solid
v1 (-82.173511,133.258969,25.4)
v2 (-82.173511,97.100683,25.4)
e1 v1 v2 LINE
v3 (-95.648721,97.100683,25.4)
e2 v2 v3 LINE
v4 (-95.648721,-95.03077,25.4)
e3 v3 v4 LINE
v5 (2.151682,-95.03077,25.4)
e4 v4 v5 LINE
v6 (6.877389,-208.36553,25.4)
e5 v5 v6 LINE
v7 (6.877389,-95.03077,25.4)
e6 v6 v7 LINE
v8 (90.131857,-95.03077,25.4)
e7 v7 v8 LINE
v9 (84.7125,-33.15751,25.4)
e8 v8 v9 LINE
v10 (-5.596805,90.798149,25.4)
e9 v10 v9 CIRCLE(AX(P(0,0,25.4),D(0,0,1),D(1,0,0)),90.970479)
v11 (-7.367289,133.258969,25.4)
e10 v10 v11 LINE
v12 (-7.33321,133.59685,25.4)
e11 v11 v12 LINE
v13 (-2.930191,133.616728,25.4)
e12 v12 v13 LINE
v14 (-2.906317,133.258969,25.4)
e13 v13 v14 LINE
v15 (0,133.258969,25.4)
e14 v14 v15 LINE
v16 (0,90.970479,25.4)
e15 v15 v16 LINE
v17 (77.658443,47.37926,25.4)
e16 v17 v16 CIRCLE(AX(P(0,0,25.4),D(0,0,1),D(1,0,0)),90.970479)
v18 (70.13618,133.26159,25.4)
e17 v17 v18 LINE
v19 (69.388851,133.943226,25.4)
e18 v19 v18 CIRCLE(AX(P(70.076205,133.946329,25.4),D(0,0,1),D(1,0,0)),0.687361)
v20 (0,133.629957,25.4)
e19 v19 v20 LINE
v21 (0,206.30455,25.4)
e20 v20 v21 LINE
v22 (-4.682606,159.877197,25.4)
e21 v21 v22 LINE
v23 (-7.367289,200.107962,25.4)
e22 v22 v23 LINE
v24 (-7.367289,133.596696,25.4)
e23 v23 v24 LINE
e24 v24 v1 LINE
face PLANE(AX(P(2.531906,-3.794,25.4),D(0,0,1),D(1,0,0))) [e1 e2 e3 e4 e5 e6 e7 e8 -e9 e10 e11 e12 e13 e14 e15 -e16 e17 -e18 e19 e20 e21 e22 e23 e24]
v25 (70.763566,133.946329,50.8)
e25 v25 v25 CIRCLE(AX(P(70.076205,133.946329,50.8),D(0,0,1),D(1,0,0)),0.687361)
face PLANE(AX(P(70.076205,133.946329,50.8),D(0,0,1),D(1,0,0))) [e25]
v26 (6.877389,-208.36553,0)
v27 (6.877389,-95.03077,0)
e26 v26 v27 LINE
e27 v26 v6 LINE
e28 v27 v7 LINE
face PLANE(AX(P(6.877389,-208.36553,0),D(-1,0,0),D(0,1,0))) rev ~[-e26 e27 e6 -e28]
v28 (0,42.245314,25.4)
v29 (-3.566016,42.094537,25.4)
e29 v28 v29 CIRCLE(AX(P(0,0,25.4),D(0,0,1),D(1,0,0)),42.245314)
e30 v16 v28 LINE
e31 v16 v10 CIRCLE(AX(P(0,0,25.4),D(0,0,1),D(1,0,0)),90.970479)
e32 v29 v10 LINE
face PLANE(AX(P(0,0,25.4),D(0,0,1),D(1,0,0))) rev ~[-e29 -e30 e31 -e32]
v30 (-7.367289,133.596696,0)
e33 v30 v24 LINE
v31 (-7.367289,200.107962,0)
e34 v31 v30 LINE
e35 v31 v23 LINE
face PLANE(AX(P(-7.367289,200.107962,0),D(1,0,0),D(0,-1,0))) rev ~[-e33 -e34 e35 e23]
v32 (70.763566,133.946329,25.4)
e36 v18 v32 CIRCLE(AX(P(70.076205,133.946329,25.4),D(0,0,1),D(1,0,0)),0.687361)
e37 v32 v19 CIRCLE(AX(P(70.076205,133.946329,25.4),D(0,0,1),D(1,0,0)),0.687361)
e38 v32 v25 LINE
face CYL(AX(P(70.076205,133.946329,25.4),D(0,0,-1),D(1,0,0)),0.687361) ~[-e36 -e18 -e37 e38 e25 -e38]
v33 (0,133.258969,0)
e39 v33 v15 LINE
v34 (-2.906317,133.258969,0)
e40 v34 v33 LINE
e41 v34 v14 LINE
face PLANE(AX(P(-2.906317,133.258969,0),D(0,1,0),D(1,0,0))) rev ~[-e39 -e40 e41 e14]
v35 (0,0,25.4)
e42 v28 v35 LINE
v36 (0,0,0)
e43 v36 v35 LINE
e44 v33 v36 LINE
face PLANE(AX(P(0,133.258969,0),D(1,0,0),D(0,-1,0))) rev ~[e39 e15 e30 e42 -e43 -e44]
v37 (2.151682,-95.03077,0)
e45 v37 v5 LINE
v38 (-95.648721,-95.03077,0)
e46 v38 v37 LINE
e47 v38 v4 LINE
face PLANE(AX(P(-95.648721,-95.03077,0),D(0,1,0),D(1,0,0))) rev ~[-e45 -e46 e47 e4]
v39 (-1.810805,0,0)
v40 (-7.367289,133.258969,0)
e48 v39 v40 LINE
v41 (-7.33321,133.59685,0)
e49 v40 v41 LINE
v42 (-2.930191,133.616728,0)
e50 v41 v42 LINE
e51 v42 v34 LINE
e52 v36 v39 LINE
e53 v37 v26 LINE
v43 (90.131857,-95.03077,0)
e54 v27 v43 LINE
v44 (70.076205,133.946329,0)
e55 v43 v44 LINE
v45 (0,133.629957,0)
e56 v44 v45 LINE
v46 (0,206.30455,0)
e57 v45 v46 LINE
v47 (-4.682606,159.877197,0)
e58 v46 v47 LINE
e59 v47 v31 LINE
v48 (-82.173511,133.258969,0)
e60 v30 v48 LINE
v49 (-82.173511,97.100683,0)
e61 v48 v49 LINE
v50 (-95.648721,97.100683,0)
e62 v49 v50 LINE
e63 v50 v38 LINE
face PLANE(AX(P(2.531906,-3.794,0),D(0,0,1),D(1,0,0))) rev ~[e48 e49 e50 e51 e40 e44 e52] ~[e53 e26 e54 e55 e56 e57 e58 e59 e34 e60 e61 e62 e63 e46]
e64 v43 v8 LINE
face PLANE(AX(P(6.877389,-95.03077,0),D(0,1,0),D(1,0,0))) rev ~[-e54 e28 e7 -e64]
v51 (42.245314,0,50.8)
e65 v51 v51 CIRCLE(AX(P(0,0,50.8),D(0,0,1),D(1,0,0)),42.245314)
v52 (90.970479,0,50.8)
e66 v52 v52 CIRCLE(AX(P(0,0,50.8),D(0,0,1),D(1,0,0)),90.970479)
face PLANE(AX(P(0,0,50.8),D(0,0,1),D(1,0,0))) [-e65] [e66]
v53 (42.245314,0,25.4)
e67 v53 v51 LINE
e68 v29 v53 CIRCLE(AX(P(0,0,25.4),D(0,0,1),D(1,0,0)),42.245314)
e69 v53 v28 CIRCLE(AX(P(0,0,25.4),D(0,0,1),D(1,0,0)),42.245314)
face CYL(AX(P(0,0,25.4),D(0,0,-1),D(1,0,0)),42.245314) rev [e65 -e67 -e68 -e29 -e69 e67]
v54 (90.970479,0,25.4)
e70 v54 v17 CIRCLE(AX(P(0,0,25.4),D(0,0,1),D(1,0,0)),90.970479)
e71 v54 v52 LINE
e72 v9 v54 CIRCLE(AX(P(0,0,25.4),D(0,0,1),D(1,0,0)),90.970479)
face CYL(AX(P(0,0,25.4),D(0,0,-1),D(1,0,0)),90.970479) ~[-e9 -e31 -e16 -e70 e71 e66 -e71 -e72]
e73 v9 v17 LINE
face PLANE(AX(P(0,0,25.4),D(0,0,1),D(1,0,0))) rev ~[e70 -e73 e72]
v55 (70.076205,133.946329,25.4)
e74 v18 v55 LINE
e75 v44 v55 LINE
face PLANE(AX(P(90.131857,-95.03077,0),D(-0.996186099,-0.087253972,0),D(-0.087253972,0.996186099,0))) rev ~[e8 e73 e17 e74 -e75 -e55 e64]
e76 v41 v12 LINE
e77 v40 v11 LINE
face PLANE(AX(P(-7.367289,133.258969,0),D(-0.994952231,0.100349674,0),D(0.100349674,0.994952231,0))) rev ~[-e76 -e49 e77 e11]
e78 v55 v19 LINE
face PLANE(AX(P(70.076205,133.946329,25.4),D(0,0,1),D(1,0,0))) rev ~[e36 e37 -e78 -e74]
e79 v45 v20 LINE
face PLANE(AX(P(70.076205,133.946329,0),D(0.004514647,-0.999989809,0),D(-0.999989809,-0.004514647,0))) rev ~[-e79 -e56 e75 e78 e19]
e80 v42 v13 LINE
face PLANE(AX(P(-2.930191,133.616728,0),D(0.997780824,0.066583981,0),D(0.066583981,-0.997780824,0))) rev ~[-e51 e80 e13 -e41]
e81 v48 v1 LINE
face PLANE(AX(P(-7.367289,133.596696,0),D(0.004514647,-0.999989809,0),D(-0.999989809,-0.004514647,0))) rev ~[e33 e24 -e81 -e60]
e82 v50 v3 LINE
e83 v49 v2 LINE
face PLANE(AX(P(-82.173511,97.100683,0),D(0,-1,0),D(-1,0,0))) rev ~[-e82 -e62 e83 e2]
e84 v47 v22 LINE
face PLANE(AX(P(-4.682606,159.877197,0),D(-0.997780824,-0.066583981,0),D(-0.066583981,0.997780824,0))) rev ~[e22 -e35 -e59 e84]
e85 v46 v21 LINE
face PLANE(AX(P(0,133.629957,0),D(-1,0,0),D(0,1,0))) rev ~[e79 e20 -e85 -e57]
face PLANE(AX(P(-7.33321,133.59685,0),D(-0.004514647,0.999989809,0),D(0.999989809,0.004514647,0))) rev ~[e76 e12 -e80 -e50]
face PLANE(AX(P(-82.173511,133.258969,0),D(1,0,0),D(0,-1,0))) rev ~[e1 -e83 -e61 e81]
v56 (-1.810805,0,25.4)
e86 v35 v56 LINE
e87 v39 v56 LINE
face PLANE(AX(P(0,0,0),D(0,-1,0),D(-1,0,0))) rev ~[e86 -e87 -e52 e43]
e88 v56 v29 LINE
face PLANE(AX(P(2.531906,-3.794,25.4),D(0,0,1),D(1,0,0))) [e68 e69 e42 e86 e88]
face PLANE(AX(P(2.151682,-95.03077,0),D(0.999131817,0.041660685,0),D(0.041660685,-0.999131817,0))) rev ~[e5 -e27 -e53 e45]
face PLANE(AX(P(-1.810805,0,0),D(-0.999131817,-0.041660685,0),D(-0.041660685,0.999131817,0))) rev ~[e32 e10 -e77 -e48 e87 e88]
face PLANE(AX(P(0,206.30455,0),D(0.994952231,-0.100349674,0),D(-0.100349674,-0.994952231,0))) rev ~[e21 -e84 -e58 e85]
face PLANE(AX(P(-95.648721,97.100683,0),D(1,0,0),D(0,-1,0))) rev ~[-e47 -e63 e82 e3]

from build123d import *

# Parameters (mm, degrees)
F1_DEPTH = 25.4
F2_R     = 0.6873607635
F2_R_2   = 90.9704794281
F2_R_3   = 42.2453138018
F3_DEPTH = 25.4


with BuildPart() as f1:
    # F0 (on Top) → F1 (new body)
    with BuildSketch(Plane.XY):
        Polygon((0, 89.7069421623), (0, 0), (-1.810804775, 0), (2.1516823224, -95.0307697058), (6.8773888052, -95.0307697058), (6.8773888052, -13.3527815342), align=None)
        Polygon((2.1516823224, -95.0307697058), (-1.810804775, 0), (-95.6487208605, 0), (-95.6487208605, -95.0307697058), align=None)
        Polygon((-95.6487208605, 0), (-1.810804775, 0), (-5.859600791, 97.1006825566), (-82.1735113859, 97.1006825566), (-95.6487208605, 97.1006825566), align=None)
        Polygon((0, 97.1006825566), (0, 89.7069421623), (6.8773888052, -13.3527815342), (6.8773888052, -95.0307697058), (90.1318565011, -95.0307697058), (70.0762048364, 133.9463293552), (0, 133.6299567875), (0, 133.2589685917), align=None)
        Polygon((-82.1735113859, 97.1006825566), (-5.859600791, 97.1006825566), (-7.3672886938, 133.2589685917), (-82.1735113859, 133.2589685917), align=None)
        Polygon((6.8773888052, -95.0307697058), (2.1516823224, -95.0307697058), (6.8773888052, -208.3655297756), align=None)
        Polygon((-7.3672886938, 133.5966957391), (-7.3672886938, 133.2589685917), (-7.3332104262, 133.596849592), align=None)
        Polygon((-82.1735113859, 133.2589685917), (-7.3672886938, 133.2589685917), (-7.3672886938, 133.5966957391), align=None)
        Polygon((-2.9063169225, 133.2589685917), (0, 133.2589685917), (0, 133.6299567875), (-2.9301909404, 133.6167278743), align=None)
        Polygon((-7.3672886938, 133.5966957391), (-7.3332104262, 133.596849592), (-4.6826064537, 159.8771973232), (-7.3672886938, 200.1079618931), align=None)
        Polygon((-4.6826064537, 159.8771973232), (-7.3332104262, 133.596849592), (-2.9301909404, 133.6167278743), align=None)
        Polygon((-2.9301909404, 133.6167278743), (0, 133.6299567875), (0, 206.3045501709), (-4.6826064537, 159.8771973232), align=None)
    extrude(amount=F1_DEPTH)

    # F2 (on face) → F3 (join)
    with BuildSketch(Plane.XY.offset(25.4)):
        with Locations((70.0762048364, 133.9463293552)):
            Circle(F2_R)
        Circle(F2_R_2)
        Circle(F2_R_3, mode=Mode.SUBTRACT)
    extrude(amount=F3_DEPTH)


solid = f1.part
